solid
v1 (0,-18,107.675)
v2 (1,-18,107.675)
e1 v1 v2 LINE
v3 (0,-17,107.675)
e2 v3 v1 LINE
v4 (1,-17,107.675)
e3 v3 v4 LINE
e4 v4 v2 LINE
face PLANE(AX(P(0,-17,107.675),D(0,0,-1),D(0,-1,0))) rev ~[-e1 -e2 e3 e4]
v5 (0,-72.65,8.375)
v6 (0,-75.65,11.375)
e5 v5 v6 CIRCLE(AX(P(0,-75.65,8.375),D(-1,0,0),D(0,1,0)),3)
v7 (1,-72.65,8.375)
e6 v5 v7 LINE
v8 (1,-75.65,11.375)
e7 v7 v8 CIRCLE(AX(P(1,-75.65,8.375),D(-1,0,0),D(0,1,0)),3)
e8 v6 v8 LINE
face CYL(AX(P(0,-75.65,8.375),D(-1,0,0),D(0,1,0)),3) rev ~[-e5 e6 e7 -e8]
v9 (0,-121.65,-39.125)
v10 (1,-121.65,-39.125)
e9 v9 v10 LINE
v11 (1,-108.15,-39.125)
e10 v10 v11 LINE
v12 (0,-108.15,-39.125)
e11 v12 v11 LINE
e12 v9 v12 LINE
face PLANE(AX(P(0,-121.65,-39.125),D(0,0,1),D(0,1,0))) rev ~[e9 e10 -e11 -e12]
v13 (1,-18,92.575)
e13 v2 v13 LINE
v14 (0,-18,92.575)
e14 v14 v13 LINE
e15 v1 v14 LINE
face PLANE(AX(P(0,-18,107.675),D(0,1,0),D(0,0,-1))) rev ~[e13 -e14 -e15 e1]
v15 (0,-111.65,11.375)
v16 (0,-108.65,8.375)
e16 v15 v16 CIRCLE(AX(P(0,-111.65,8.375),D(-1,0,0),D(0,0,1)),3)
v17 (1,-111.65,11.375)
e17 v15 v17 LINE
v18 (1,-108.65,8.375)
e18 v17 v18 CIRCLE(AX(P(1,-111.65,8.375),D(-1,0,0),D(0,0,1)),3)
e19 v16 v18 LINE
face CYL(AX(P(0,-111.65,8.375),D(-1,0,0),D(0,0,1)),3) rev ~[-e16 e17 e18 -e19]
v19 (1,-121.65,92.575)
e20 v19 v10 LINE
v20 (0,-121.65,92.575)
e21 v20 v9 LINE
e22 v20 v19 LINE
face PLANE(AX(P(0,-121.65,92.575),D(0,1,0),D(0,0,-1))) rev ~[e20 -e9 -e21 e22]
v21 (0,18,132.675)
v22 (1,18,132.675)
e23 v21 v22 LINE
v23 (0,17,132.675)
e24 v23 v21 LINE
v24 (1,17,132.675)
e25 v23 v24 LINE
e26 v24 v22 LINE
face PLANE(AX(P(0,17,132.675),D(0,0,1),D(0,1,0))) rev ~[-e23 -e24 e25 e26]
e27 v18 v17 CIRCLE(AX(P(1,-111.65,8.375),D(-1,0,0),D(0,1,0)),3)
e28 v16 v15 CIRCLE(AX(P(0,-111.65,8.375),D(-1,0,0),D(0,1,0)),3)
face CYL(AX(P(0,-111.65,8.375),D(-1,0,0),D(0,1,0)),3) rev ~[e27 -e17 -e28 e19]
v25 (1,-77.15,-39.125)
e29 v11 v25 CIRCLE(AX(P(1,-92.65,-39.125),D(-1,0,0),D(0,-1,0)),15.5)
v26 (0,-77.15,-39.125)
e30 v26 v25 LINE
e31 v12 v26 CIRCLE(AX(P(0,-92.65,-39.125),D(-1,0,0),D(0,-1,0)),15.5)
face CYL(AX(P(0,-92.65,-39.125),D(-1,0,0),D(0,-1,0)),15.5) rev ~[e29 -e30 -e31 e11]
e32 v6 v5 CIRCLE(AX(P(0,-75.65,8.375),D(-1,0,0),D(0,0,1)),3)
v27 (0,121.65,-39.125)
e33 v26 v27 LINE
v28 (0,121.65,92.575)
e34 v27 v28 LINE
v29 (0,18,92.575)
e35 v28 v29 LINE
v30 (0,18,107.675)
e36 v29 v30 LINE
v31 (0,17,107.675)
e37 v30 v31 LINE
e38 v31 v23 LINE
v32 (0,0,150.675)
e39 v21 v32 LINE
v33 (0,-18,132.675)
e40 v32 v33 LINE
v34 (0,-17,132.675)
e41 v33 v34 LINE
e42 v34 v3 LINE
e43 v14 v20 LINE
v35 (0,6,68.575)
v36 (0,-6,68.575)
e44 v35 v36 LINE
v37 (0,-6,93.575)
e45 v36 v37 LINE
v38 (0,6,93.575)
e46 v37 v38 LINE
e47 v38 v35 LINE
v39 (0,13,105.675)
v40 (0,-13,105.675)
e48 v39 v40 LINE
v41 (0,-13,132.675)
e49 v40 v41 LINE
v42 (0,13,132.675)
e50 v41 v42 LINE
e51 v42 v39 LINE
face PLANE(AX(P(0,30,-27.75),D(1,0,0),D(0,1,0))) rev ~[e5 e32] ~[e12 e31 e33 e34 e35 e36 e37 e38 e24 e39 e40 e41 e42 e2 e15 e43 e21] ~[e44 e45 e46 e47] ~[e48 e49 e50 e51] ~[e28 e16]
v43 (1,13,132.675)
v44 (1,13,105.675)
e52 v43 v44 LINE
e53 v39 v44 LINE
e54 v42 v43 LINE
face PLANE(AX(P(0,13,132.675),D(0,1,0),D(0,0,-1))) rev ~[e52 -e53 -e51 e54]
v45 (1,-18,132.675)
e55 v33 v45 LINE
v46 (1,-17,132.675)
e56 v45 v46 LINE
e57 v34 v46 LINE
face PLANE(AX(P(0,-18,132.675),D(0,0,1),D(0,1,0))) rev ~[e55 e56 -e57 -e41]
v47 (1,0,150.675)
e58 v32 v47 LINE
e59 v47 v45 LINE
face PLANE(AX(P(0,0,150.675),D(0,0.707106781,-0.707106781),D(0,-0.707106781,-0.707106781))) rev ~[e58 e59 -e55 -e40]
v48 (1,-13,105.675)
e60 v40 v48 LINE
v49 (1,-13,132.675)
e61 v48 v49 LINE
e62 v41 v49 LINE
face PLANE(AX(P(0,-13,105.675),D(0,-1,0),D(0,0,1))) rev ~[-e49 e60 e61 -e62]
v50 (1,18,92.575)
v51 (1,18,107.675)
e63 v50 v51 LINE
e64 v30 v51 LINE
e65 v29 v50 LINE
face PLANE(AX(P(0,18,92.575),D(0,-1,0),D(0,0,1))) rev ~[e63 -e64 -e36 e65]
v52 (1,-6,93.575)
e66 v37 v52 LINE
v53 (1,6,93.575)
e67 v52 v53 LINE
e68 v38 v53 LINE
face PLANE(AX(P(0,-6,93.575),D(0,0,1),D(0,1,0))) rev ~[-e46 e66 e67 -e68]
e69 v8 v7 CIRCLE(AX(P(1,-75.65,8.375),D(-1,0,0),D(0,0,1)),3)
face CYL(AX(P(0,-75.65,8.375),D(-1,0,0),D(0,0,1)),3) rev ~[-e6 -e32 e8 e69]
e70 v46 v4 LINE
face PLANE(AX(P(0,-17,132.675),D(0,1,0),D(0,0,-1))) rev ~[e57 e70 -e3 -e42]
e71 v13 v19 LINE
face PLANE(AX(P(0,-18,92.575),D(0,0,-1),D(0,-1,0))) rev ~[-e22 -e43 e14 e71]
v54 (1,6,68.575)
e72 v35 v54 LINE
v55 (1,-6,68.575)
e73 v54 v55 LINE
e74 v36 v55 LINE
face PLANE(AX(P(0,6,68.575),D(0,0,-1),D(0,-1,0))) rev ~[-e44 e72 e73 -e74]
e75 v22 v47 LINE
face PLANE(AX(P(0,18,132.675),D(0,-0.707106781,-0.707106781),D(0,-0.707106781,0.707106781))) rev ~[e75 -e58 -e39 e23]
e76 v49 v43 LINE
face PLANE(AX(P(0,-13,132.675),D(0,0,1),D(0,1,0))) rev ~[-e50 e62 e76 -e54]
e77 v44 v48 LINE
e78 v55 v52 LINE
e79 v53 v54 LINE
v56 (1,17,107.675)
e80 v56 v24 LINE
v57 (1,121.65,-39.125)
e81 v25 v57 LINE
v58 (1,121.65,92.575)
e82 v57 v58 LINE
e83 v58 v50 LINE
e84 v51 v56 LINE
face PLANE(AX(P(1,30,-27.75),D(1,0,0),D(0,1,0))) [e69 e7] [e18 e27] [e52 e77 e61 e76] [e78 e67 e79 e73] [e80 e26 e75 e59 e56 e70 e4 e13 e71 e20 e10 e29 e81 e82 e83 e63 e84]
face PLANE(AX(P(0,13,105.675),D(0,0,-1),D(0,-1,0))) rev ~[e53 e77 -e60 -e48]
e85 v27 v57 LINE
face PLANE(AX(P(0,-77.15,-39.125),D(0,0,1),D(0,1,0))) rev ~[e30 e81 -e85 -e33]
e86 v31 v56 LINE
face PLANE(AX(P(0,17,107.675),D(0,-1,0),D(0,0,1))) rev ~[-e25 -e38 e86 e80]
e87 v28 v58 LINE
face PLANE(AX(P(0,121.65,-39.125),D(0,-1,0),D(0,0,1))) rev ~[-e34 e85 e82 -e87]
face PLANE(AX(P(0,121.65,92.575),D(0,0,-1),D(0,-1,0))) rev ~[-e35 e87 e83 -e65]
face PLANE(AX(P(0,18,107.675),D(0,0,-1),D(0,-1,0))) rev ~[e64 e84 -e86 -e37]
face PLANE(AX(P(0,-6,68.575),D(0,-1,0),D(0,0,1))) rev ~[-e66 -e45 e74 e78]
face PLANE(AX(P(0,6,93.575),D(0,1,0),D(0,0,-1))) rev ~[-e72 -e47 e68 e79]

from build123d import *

# Parameters (mm, degrees)
F0_W     = 19.65
F0_H     = 1.5
F1_DEPTH = 1


# Not quite as in the source:
# - a feature names something its author has since deleted; it is built from what else it names


with BuildPart() as f1:
    # F0 (on Right) → F1 (new body)
    with BuildSketch(Plane.YZ):
        Polygon((121.65, -16.375), (19.65, -16.375), (-19.65, -16.375), (-61.65, -16.375), (-61.65, -39.125), (121.65, -39.125), align=None)
        Polygon((-19.65, -16.375), (19.65, -16.375), (19.65, 14.875), (0, 14.875), (-19.65, 14.875), align=None)
        Polygon((19.65, 14.875), (19.65, -16.375), (121.65, -16.375), (121.65, 16.375), (19.65, 16.375), align=None)
        Polygon((-61.65, -16.375), (-19.65, -16.375), (-19.65, 14.875), (-19.65, 16.375), (-19.65, 57.475), (-19.65, 92.575), (-121.65, 92.575), (-121.65, 89.375), (-121.65, 16.375), (-111.65, 16.375), (-75.65, 16.375), (-61.65, 16.375), align=None)
        with Locations((9.825, 15.625)):
            Rectangle(F0_W, F0_H)
        with Locations((-9.825, 15.625)):
            Rectangle(F0_W, F0_H)
        with BuildLine():
            Line((-61.65, -39.125), (-61.65, -16.375))
            Line((-61.65, -16.375), (-121.65, -16.375))
            Line((-121.65, -16.375), (-121.65, -39.125))
            Line((-121.65, -39.125), (-111.65, -39.125))
            ThreePointArc((-111.65, -39.125), (-92.65, -20.125), (-73.65, -39.125))
            Line((-73.65, -39.125), (-61.65, -39.125))
        make_face()
        Polygon((-121.65, -16.375), (-61.65, -16.375), (-61.65, 16.375), (-75.65, 16.375), (-111.65, 16.375), (-121.65, 16.375), align=None)
        with BuildLine():
            ThreePointArc((-108.65, 8.375), (-113.7713203436, 6.2536796564), (-111.65, 11.375))
            ThreePointArc((-111.65, 11.375), (-109.5286796564, 10.4963203436), (-108.65, 8.375))
        make_face(mode=Mode.SUBTRACT)
        with BuildLine():
            ThreePointArc((-72.65, 8.375), (-77.7713203436, 6.2536796564), (-75.65, 11.375))
            ThreePointArc((-75.65, 11.375), (-73.5286796564, 10.4963203436), (-72.65, 8.375))
        make_face(mode=Mode.SUBTRACT)
        Polygon((19.65, 57.475), (19.65, 16.375), (121.65, 16.375), (121.65, 89.375), (121.65, 92.575), (19.65, 92.575), align=None)
        Polygon((0, 16.375), (19.65, 16.375), (19.65, 57.475), (6, 57.475), (6, 29.475), (0, 29.475), align=None)
        Polygon((-19.65, 57.475), (-19.65, 16.375), (0, 16.375), (0, 29.475), (-6, 29.475), (-6, 57.475), align=None)
        Polygon((6, 57.475), (19.65, 57.475), (19.65, 92.575), (18, 92.575), (18, 105.675), (18, 107.675), (17, 107.675), (17, 132.675), (18, 132.675), (0, 150.675), (0, 132.675), (13, 132.675), (13, 105.675), (0, 105.675), (0, 93.575), (6, 93.575), (6, 92.575), (6, 89.375), (6, 70.575), (6, 68.575), align=None)
        Polygon((-19.65, 92.575), (-19.65, 57.475), (-6, 57.475), (-6, 29.475), (0, 29.475), (6, 29.475), (6, 57.475), (6, 68.575), (-6, 68.575), (-6, 70.575), (-6, 92.575), (-6, 93.575), (0, 93.575), (0, 105.675), (-13, 105.675), (-13, 132.675), (0, 132.675), (0, 150.675), (-18, 132.675), (-17, 132.675), (-17, 107.675), (-18, 107.675), (-18, 105.675), (-18, 92.575), align=None)
        with BuildLine():
            Line((-77.15, -39.125), (-73.65, -39.125))
            ThreePointArc((-73.65, -39.125), (-92.65, -20.125), (-111.65, -39.125))
            Line((-111.65, -39.125), (-108.15, -39.125))
            ThreePointArc((-108.15, -39.125), (-92.65, -23.625), (-77.15, -39.125))
        make_face()
    extrude(amount=F1_DEPTH)


solid = f1.part
